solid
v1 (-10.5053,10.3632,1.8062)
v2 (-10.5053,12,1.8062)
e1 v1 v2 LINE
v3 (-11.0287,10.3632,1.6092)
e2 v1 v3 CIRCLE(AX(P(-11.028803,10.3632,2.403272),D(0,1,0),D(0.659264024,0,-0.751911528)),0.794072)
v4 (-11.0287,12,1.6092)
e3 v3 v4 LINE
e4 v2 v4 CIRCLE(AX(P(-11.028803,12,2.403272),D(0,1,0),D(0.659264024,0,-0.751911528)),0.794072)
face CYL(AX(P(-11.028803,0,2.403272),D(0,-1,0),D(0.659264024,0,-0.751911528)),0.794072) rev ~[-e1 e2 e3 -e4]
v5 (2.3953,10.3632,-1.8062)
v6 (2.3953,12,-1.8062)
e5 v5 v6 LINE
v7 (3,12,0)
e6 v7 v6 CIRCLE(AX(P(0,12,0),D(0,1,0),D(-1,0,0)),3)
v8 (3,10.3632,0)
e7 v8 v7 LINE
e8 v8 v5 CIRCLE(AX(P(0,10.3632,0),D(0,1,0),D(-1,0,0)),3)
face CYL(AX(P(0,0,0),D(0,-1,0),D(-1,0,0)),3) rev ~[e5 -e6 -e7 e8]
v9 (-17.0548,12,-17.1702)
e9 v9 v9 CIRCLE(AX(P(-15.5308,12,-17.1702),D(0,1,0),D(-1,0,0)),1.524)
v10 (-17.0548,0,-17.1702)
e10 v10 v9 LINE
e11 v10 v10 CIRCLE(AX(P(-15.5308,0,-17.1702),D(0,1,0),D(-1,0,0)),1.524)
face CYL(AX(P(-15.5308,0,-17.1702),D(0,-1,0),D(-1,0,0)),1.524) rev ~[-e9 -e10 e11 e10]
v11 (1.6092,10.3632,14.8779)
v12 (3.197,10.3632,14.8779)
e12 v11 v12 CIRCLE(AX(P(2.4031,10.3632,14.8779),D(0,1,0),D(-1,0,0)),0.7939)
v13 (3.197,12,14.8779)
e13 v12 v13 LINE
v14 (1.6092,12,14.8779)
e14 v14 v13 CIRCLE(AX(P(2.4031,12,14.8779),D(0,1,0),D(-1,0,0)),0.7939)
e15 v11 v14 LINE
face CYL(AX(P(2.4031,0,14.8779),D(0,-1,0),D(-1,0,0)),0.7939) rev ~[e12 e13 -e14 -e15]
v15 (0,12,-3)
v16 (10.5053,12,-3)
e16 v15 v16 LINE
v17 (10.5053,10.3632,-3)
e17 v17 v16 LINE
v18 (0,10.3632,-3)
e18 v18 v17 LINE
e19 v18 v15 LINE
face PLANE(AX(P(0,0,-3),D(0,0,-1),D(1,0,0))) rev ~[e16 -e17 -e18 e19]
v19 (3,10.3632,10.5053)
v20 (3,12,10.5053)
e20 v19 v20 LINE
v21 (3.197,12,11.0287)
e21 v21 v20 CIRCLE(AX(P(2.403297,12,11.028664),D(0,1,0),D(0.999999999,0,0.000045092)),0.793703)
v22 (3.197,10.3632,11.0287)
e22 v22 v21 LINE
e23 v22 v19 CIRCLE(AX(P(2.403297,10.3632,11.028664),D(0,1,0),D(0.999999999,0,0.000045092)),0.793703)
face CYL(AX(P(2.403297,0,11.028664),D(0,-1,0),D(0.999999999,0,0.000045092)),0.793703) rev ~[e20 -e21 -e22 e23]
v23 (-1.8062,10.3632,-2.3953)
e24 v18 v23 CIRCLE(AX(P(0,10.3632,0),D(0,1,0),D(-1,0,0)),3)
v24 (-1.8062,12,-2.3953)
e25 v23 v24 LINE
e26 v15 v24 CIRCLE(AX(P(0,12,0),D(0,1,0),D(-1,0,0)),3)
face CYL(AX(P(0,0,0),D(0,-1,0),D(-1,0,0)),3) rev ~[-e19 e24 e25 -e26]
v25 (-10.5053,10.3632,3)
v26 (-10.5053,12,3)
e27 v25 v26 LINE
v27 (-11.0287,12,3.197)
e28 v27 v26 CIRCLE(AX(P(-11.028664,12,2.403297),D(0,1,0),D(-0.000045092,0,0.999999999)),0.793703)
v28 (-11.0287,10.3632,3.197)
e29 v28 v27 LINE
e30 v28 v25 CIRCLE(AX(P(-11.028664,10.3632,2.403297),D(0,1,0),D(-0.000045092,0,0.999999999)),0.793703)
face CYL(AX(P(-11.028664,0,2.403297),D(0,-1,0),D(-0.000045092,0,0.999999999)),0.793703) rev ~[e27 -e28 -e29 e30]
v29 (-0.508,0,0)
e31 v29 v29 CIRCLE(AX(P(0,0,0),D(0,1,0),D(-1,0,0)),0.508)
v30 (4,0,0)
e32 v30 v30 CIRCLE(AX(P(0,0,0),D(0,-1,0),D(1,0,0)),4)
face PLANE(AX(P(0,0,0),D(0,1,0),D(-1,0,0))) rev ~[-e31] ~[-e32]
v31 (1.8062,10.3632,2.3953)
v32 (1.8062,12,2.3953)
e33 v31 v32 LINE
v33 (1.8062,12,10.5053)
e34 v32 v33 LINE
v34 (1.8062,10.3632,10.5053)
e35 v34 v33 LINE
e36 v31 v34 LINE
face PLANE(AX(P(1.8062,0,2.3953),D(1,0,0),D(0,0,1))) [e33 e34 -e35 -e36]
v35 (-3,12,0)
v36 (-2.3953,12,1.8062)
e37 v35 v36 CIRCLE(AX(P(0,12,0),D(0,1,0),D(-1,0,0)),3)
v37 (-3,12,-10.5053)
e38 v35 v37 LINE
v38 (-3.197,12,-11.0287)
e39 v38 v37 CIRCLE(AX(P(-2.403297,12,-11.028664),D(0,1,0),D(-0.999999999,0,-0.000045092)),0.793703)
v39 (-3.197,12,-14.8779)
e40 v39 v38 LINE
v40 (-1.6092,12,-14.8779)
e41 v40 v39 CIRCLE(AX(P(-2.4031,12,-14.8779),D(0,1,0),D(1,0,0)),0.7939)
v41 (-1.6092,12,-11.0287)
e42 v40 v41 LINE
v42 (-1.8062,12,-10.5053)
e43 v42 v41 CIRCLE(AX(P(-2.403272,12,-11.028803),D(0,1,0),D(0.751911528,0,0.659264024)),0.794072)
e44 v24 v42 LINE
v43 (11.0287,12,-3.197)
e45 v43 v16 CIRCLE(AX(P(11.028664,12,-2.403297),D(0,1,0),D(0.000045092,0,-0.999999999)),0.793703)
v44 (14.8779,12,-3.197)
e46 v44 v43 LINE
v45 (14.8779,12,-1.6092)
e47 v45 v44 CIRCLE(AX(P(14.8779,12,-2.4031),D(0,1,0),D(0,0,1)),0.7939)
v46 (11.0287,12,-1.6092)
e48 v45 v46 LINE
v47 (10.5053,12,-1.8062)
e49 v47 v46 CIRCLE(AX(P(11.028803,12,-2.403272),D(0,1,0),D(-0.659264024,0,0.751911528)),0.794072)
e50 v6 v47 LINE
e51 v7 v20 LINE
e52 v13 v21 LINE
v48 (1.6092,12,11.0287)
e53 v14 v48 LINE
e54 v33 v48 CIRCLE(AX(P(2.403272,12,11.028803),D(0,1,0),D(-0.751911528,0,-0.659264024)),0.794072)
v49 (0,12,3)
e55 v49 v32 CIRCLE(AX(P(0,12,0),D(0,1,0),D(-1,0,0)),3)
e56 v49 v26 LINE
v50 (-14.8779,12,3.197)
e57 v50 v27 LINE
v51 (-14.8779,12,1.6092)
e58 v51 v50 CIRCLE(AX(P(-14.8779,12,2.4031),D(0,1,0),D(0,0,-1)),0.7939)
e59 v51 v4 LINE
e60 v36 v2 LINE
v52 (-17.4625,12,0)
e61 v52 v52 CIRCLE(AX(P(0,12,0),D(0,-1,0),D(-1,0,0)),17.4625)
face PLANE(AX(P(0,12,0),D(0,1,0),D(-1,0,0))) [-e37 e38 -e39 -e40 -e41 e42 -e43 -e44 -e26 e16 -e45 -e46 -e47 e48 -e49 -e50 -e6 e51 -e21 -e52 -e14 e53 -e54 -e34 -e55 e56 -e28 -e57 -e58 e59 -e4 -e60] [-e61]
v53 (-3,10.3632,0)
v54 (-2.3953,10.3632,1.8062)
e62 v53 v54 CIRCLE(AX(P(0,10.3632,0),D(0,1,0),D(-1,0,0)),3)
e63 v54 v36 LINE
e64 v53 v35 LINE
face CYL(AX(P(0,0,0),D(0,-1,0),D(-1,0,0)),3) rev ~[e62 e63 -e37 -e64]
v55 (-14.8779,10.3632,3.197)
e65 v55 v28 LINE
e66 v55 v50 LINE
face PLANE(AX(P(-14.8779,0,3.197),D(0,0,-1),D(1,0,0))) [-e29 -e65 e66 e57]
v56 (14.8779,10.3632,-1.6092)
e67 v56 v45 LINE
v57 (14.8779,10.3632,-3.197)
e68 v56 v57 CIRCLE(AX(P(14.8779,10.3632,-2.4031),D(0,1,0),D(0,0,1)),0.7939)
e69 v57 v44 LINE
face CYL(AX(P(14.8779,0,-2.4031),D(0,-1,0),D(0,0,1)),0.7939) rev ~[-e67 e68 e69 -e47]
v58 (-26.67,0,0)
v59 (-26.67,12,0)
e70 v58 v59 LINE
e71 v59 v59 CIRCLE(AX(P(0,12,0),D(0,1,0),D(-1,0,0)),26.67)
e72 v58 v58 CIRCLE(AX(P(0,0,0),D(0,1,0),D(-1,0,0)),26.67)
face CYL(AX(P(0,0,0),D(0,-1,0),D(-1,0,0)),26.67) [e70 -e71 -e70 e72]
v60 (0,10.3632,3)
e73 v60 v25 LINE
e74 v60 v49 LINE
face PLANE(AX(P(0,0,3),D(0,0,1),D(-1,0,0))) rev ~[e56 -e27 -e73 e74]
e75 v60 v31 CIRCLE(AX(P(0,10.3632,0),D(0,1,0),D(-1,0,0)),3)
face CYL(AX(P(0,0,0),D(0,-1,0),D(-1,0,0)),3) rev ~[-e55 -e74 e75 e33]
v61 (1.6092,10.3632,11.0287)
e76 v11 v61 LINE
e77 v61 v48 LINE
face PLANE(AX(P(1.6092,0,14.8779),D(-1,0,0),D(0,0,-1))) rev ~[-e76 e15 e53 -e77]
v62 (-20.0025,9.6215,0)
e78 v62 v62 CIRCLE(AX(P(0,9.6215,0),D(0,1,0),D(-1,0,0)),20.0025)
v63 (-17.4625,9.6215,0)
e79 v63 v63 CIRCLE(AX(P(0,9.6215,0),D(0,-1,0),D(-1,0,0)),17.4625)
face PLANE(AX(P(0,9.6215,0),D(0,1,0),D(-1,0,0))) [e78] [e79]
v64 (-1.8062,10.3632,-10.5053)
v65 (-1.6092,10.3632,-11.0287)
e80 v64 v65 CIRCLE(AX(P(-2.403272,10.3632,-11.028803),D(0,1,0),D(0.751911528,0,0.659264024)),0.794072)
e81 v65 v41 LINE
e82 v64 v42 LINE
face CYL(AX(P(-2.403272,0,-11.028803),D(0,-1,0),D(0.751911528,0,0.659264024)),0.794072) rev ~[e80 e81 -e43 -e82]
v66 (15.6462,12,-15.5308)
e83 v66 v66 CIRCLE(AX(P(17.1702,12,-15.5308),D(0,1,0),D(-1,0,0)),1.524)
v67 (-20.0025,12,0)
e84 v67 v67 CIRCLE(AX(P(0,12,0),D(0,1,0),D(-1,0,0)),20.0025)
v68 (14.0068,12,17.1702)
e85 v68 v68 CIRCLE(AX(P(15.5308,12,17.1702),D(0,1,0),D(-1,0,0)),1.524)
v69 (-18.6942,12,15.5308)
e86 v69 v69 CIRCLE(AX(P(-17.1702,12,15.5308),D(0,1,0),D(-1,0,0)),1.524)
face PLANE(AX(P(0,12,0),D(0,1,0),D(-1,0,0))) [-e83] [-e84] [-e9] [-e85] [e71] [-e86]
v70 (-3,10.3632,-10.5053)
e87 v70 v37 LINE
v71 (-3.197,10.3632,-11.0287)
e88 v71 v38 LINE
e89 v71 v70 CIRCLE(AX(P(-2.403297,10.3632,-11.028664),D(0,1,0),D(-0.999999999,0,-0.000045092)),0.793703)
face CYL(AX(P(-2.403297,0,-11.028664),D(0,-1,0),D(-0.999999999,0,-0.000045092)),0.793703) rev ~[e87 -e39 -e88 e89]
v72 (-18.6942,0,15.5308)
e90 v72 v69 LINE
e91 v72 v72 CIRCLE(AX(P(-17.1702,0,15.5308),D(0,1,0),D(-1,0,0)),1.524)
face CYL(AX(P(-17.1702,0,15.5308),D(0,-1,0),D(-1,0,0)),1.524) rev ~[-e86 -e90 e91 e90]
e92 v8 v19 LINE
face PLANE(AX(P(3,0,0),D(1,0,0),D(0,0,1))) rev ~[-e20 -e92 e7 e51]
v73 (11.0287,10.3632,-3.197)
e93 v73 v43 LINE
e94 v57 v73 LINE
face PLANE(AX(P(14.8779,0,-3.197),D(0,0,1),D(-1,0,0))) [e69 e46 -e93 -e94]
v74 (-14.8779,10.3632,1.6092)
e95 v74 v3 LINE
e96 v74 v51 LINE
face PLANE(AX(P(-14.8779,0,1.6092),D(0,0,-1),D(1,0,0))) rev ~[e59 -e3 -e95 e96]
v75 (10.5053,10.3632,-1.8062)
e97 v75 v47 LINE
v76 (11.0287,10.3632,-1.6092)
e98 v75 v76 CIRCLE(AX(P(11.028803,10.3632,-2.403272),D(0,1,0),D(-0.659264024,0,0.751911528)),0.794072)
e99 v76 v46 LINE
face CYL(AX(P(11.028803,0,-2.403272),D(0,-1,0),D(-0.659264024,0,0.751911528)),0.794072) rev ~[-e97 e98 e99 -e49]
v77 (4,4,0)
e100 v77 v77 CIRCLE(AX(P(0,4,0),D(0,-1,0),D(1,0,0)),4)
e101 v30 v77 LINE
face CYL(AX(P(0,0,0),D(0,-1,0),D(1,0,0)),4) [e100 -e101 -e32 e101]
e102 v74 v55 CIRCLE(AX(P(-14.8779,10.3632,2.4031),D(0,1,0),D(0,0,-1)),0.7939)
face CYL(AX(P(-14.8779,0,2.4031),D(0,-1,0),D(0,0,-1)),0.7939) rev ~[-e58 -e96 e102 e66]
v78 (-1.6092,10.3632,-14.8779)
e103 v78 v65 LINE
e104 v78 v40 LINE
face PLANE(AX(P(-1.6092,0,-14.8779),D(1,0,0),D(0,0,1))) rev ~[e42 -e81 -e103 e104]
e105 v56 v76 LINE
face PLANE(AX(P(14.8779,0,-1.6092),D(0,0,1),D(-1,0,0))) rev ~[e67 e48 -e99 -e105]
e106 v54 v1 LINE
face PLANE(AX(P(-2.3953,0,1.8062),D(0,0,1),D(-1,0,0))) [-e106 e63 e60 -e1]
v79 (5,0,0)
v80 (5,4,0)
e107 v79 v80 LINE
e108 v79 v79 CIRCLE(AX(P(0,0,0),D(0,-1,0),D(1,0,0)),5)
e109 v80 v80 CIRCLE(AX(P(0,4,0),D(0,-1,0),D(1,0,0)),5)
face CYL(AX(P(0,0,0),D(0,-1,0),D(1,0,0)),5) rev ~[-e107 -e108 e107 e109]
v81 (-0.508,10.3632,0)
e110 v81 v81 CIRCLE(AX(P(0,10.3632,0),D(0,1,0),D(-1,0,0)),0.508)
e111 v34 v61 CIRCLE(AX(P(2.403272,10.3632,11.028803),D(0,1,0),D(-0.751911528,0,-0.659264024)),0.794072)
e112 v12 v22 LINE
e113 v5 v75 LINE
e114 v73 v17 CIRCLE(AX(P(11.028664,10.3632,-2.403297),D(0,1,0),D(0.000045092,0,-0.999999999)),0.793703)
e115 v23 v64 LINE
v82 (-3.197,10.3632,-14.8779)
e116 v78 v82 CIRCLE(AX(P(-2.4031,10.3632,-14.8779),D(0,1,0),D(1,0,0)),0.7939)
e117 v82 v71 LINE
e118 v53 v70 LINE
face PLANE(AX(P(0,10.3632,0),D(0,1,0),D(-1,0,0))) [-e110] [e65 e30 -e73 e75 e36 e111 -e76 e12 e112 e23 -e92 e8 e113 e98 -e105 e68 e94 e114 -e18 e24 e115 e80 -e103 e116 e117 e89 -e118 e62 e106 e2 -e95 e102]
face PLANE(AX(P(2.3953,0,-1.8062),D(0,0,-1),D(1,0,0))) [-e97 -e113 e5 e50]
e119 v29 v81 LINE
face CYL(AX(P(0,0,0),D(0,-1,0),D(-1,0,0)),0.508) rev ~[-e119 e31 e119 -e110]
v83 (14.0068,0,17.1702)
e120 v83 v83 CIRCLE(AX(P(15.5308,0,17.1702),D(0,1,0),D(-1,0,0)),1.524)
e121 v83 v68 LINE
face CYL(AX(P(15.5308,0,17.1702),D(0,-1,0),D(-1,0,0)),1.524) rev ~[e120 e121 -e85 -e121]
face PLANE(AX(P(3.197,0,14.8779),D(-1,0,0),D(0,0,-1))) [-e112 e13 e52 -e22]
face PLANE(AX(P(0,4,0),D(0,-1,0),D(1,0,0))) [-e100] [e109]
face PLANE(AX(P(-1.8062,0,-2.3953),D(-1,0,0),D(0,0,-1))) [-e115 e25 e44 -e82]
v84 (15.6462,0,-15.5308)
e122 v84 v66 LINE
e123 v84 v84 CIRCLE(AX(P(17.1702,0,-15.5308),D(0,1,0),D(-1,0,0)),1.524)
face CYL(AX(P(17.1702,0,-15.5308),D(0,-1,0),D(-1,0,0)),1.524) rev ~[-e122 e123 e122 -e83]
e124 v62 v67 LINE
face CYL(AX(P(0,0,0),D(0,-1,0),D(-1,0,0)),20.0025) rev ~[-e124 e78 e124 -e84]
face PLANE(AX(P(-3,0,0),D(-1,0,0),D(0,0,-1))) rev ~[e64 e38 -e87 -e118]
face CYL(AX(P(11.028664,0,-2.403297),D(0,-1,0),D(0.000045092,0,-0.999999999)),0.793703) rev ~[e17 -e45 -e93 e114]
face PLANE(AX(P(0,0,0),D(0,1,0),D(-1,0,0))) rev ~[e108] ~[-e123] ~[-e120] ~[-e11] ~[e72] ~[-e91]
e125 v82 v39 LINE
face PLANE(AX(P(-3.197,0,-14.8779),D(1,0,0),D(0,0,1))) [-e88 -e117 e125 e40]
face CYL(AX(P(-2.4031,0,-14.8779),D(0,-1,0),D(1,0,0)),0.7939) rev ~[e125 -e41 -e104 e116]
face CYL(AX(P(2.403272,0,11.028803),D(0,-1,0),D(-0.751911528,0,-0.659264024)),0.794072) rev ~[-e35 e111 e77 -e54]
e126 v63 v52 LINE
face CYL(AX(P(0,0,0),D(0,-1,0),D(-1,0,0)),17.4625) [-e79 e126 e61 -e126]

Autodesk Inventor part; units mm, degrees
ref_plane "YZ Plane" through (0, 0, 0) normal (1, 0, 0) x (0, 1, 0)
ref_plane "XZ Plane" through (0, 0, 0) normal (0, 1, 0) x (-1, 0, 0)
ref_plane "XY Plane" through (0, 0, 0) normal (0, 0, 1) x (1, 0, 0)
sketch "Sketch1" plane through (0, 0, 0) normal (0, 1, 0) x (-1, 0, 0)
  circle A0 centre (0, 0) radius 0.508
  circle A1 centre (0, 0) radius 3
  line L0 (1.8062, -2.3953) -> (1.8062, -10.5053)
  arc A2 (1.6092, -14.8779) -> (3.197, -14.8779) centre (2.4031, -14.8779) ccw
  line L1 (3.197, -14.8779) -> (3.197, -11.0287)
  line L2 (1.6092, -14.8779) -> (1.6092, -11.0287)
  line L3 (3, 0) -> (3, -10.5053)
  arc A3 (3.197, -11.0287) -> (3, -10.5053) centre (2.4031, -11.0287) ccw
  arc A4 (1.8062, -10.5053) -> (1.6092, -11.0287) centre (2.4031, -11.0287) ccw
  line L4 (0, 3) -> (10.5053, 3)
  line L5 (14.8779, 3.197) -> (11.0287, 3.197)
  line L6 (14.8779, 1.6092) -> (11.0287, 1.6092)
  arc A5 (14.8779, 1.6092) -> (14.8779, 3.197) centre (14.8779, 2.4031) ccw
  arc A6 (11.0287, 3.197) -> (10.5053, 3) centre (11.0287, 2.4031) ccw
  arc A7 (10.5053, 1.8062) -> (11.0287, 1.6092) centre (11.0287, 2.4031) ccw
  line L7 (2.3953, 1.8062) -> (10.5053, 1.8062)
  line L8 (-3, 0) -> (-3, 10.5053)
  line L9 (-3.197, 14.8779) -> (-3.197, 11.0287)
  line L10 (-1.6092, 14.8779) -> (-1.6092, 11.0287)
  arc A8 (-1.6092, 14.8779) -> (-3.197, 14.8779) centre (-2.4031, 14.8779) ccw
  arc A9 (-3.197, 11.0287) -> (-3, 10.5053) centre (-2.4031, 11.0287) ccw
  arc A10 (-1.8062, 10.5053) -> (-1.6092, 11.0287) centre (-2.4031, 11.0287) ccw
  line L11 (-1.8062, 2.3953) -> (-1.8062, 10.5053)
  line L12 (0, -3) -> (-10.5053, -3)
  line L13 (-14.8779, -3.197) -> (-11.0287, -3.197)
  line L14 (-14.8779, -1.6092) -> (-11.0287, -1.6092)
  arc A11 (-14.8779, -1.6092) -> (-14.8779, -3.197) centre (-14.8779, -2.4031) ccw
  arc A12 (-11.0287, -3.197) -> (-10.5053, -3) centre (-11.0287, -2.4031) ccw
  arc A13 (-10.5053, -1.8062) -> (-11.0287, -1.6092) centre (-11.0287, -2.4031) ccw
  line L15 (-2.3953, -1.8062) -> (-10.5053, -1.8062)
  circle A14 centre (0, 0) radius 17.4625
  circle A15 centre (0, 0) radius 20.0025
  circle A16 centre (0, 0) radius 26.67
  line L16 (0, 0) -> (26.67, 0) construction
  circle A17 centre (15.5308, -17.1702) radius 1.524
  circle A18 centre (17.1702, 15.5308) radius 1.524
  circle A19 centre (-15.5308, 17.1702) radius 1.524
  circle A20 centre (-17.1702, -15.5308) radius 1.524
  arc A21 (3.197, -11.0287) -> (1.6092, -11.0287) centre (2.4031, -11.0287) ccw
  arc A22 (11.0287, 3.197) -> (11.0287, 1.6092) centre (11.0287, 2.4031) ccw
  arc A23 (-3.197, 11.0287) -> (-1.6092, 11.0287) centre (-2.4031, 11.0287) ccw
  arc A24 (-11.0287, -3.197) -> (-11.0287, -1.6092) centre (-11.0287, -2.4031) ccw
  line L17 (0, 0) -> (14.8779, 0)
  line L18 (17.0946, 3.5656) -> (17.0946, 3)
  line L19 (17.0946, 1.8062) -> (17.0946, 1.6092)
  point P0 (2.4031, -15.6718)
  dimension "d16" = 34.925
  dimension "d0" = 1.016
  dimension "d1" = 6
  dimension "d13" = 360
  dimension "d17" = 40.005
  dimension "d18" = 53.34
  dimension "d24" = 360
  dimension "d28" = 360
  dimension "d44" = 17.1702
extrude "Extrusion1" add sketch "Sketch1" along normal blind 12 contours A14 | A16
extrude "Extrusion2" add sketch "Sketch1" along normal blind 10.3632 contours A1 | L3 A21 L0 A1 | A1 L4 A22 L7 | A3 L1 A2 L2 A4 A21 | A22 A6 L5 A5 L6 A7 | L12 A24 L15 A1 | A1 L8 A23 L11 | A12 L13 A11 L14 A13 A24 | A23 A9 L9 A8 L10 A10
extrude "Extrusion3" add sketch "Sketch1" along normal blind 9.6215 contours A15
thread "Thread1" size "M3x0.5" class "6H" standard "ANSI Metric M Profile" length 10
thread "Thread2" size "M3x0.5" class "6H" standard "ANSI Metric M Profile" length 10
thread "Thread3" size "M3x0.5" class "6H" standard "ANSI Metric M Profile" length 10
thread "Thread4" size "M3x0.5" class "6H" standard "ANSI Metric M Profile" length 10
sketch "Sketch2" plane through (0, 0, 0) normal (0, -1, 0) x (1, 0, 0)
  circle A0 centre (0, 0) radius 4
  circle A1 centre (0, 0) radius 0.508 projected
  circle A2 centre (0, 0) radius 5
  dimension "d46" = 8
  dimension "d47" = 10
extrude "Extrusion4" cut sketch "Sketch2" against normal blind 4 contours A2
thread "Thread5" size "M8x1.25" class "6g" standard "ANSI Metric M Profile" length 10
